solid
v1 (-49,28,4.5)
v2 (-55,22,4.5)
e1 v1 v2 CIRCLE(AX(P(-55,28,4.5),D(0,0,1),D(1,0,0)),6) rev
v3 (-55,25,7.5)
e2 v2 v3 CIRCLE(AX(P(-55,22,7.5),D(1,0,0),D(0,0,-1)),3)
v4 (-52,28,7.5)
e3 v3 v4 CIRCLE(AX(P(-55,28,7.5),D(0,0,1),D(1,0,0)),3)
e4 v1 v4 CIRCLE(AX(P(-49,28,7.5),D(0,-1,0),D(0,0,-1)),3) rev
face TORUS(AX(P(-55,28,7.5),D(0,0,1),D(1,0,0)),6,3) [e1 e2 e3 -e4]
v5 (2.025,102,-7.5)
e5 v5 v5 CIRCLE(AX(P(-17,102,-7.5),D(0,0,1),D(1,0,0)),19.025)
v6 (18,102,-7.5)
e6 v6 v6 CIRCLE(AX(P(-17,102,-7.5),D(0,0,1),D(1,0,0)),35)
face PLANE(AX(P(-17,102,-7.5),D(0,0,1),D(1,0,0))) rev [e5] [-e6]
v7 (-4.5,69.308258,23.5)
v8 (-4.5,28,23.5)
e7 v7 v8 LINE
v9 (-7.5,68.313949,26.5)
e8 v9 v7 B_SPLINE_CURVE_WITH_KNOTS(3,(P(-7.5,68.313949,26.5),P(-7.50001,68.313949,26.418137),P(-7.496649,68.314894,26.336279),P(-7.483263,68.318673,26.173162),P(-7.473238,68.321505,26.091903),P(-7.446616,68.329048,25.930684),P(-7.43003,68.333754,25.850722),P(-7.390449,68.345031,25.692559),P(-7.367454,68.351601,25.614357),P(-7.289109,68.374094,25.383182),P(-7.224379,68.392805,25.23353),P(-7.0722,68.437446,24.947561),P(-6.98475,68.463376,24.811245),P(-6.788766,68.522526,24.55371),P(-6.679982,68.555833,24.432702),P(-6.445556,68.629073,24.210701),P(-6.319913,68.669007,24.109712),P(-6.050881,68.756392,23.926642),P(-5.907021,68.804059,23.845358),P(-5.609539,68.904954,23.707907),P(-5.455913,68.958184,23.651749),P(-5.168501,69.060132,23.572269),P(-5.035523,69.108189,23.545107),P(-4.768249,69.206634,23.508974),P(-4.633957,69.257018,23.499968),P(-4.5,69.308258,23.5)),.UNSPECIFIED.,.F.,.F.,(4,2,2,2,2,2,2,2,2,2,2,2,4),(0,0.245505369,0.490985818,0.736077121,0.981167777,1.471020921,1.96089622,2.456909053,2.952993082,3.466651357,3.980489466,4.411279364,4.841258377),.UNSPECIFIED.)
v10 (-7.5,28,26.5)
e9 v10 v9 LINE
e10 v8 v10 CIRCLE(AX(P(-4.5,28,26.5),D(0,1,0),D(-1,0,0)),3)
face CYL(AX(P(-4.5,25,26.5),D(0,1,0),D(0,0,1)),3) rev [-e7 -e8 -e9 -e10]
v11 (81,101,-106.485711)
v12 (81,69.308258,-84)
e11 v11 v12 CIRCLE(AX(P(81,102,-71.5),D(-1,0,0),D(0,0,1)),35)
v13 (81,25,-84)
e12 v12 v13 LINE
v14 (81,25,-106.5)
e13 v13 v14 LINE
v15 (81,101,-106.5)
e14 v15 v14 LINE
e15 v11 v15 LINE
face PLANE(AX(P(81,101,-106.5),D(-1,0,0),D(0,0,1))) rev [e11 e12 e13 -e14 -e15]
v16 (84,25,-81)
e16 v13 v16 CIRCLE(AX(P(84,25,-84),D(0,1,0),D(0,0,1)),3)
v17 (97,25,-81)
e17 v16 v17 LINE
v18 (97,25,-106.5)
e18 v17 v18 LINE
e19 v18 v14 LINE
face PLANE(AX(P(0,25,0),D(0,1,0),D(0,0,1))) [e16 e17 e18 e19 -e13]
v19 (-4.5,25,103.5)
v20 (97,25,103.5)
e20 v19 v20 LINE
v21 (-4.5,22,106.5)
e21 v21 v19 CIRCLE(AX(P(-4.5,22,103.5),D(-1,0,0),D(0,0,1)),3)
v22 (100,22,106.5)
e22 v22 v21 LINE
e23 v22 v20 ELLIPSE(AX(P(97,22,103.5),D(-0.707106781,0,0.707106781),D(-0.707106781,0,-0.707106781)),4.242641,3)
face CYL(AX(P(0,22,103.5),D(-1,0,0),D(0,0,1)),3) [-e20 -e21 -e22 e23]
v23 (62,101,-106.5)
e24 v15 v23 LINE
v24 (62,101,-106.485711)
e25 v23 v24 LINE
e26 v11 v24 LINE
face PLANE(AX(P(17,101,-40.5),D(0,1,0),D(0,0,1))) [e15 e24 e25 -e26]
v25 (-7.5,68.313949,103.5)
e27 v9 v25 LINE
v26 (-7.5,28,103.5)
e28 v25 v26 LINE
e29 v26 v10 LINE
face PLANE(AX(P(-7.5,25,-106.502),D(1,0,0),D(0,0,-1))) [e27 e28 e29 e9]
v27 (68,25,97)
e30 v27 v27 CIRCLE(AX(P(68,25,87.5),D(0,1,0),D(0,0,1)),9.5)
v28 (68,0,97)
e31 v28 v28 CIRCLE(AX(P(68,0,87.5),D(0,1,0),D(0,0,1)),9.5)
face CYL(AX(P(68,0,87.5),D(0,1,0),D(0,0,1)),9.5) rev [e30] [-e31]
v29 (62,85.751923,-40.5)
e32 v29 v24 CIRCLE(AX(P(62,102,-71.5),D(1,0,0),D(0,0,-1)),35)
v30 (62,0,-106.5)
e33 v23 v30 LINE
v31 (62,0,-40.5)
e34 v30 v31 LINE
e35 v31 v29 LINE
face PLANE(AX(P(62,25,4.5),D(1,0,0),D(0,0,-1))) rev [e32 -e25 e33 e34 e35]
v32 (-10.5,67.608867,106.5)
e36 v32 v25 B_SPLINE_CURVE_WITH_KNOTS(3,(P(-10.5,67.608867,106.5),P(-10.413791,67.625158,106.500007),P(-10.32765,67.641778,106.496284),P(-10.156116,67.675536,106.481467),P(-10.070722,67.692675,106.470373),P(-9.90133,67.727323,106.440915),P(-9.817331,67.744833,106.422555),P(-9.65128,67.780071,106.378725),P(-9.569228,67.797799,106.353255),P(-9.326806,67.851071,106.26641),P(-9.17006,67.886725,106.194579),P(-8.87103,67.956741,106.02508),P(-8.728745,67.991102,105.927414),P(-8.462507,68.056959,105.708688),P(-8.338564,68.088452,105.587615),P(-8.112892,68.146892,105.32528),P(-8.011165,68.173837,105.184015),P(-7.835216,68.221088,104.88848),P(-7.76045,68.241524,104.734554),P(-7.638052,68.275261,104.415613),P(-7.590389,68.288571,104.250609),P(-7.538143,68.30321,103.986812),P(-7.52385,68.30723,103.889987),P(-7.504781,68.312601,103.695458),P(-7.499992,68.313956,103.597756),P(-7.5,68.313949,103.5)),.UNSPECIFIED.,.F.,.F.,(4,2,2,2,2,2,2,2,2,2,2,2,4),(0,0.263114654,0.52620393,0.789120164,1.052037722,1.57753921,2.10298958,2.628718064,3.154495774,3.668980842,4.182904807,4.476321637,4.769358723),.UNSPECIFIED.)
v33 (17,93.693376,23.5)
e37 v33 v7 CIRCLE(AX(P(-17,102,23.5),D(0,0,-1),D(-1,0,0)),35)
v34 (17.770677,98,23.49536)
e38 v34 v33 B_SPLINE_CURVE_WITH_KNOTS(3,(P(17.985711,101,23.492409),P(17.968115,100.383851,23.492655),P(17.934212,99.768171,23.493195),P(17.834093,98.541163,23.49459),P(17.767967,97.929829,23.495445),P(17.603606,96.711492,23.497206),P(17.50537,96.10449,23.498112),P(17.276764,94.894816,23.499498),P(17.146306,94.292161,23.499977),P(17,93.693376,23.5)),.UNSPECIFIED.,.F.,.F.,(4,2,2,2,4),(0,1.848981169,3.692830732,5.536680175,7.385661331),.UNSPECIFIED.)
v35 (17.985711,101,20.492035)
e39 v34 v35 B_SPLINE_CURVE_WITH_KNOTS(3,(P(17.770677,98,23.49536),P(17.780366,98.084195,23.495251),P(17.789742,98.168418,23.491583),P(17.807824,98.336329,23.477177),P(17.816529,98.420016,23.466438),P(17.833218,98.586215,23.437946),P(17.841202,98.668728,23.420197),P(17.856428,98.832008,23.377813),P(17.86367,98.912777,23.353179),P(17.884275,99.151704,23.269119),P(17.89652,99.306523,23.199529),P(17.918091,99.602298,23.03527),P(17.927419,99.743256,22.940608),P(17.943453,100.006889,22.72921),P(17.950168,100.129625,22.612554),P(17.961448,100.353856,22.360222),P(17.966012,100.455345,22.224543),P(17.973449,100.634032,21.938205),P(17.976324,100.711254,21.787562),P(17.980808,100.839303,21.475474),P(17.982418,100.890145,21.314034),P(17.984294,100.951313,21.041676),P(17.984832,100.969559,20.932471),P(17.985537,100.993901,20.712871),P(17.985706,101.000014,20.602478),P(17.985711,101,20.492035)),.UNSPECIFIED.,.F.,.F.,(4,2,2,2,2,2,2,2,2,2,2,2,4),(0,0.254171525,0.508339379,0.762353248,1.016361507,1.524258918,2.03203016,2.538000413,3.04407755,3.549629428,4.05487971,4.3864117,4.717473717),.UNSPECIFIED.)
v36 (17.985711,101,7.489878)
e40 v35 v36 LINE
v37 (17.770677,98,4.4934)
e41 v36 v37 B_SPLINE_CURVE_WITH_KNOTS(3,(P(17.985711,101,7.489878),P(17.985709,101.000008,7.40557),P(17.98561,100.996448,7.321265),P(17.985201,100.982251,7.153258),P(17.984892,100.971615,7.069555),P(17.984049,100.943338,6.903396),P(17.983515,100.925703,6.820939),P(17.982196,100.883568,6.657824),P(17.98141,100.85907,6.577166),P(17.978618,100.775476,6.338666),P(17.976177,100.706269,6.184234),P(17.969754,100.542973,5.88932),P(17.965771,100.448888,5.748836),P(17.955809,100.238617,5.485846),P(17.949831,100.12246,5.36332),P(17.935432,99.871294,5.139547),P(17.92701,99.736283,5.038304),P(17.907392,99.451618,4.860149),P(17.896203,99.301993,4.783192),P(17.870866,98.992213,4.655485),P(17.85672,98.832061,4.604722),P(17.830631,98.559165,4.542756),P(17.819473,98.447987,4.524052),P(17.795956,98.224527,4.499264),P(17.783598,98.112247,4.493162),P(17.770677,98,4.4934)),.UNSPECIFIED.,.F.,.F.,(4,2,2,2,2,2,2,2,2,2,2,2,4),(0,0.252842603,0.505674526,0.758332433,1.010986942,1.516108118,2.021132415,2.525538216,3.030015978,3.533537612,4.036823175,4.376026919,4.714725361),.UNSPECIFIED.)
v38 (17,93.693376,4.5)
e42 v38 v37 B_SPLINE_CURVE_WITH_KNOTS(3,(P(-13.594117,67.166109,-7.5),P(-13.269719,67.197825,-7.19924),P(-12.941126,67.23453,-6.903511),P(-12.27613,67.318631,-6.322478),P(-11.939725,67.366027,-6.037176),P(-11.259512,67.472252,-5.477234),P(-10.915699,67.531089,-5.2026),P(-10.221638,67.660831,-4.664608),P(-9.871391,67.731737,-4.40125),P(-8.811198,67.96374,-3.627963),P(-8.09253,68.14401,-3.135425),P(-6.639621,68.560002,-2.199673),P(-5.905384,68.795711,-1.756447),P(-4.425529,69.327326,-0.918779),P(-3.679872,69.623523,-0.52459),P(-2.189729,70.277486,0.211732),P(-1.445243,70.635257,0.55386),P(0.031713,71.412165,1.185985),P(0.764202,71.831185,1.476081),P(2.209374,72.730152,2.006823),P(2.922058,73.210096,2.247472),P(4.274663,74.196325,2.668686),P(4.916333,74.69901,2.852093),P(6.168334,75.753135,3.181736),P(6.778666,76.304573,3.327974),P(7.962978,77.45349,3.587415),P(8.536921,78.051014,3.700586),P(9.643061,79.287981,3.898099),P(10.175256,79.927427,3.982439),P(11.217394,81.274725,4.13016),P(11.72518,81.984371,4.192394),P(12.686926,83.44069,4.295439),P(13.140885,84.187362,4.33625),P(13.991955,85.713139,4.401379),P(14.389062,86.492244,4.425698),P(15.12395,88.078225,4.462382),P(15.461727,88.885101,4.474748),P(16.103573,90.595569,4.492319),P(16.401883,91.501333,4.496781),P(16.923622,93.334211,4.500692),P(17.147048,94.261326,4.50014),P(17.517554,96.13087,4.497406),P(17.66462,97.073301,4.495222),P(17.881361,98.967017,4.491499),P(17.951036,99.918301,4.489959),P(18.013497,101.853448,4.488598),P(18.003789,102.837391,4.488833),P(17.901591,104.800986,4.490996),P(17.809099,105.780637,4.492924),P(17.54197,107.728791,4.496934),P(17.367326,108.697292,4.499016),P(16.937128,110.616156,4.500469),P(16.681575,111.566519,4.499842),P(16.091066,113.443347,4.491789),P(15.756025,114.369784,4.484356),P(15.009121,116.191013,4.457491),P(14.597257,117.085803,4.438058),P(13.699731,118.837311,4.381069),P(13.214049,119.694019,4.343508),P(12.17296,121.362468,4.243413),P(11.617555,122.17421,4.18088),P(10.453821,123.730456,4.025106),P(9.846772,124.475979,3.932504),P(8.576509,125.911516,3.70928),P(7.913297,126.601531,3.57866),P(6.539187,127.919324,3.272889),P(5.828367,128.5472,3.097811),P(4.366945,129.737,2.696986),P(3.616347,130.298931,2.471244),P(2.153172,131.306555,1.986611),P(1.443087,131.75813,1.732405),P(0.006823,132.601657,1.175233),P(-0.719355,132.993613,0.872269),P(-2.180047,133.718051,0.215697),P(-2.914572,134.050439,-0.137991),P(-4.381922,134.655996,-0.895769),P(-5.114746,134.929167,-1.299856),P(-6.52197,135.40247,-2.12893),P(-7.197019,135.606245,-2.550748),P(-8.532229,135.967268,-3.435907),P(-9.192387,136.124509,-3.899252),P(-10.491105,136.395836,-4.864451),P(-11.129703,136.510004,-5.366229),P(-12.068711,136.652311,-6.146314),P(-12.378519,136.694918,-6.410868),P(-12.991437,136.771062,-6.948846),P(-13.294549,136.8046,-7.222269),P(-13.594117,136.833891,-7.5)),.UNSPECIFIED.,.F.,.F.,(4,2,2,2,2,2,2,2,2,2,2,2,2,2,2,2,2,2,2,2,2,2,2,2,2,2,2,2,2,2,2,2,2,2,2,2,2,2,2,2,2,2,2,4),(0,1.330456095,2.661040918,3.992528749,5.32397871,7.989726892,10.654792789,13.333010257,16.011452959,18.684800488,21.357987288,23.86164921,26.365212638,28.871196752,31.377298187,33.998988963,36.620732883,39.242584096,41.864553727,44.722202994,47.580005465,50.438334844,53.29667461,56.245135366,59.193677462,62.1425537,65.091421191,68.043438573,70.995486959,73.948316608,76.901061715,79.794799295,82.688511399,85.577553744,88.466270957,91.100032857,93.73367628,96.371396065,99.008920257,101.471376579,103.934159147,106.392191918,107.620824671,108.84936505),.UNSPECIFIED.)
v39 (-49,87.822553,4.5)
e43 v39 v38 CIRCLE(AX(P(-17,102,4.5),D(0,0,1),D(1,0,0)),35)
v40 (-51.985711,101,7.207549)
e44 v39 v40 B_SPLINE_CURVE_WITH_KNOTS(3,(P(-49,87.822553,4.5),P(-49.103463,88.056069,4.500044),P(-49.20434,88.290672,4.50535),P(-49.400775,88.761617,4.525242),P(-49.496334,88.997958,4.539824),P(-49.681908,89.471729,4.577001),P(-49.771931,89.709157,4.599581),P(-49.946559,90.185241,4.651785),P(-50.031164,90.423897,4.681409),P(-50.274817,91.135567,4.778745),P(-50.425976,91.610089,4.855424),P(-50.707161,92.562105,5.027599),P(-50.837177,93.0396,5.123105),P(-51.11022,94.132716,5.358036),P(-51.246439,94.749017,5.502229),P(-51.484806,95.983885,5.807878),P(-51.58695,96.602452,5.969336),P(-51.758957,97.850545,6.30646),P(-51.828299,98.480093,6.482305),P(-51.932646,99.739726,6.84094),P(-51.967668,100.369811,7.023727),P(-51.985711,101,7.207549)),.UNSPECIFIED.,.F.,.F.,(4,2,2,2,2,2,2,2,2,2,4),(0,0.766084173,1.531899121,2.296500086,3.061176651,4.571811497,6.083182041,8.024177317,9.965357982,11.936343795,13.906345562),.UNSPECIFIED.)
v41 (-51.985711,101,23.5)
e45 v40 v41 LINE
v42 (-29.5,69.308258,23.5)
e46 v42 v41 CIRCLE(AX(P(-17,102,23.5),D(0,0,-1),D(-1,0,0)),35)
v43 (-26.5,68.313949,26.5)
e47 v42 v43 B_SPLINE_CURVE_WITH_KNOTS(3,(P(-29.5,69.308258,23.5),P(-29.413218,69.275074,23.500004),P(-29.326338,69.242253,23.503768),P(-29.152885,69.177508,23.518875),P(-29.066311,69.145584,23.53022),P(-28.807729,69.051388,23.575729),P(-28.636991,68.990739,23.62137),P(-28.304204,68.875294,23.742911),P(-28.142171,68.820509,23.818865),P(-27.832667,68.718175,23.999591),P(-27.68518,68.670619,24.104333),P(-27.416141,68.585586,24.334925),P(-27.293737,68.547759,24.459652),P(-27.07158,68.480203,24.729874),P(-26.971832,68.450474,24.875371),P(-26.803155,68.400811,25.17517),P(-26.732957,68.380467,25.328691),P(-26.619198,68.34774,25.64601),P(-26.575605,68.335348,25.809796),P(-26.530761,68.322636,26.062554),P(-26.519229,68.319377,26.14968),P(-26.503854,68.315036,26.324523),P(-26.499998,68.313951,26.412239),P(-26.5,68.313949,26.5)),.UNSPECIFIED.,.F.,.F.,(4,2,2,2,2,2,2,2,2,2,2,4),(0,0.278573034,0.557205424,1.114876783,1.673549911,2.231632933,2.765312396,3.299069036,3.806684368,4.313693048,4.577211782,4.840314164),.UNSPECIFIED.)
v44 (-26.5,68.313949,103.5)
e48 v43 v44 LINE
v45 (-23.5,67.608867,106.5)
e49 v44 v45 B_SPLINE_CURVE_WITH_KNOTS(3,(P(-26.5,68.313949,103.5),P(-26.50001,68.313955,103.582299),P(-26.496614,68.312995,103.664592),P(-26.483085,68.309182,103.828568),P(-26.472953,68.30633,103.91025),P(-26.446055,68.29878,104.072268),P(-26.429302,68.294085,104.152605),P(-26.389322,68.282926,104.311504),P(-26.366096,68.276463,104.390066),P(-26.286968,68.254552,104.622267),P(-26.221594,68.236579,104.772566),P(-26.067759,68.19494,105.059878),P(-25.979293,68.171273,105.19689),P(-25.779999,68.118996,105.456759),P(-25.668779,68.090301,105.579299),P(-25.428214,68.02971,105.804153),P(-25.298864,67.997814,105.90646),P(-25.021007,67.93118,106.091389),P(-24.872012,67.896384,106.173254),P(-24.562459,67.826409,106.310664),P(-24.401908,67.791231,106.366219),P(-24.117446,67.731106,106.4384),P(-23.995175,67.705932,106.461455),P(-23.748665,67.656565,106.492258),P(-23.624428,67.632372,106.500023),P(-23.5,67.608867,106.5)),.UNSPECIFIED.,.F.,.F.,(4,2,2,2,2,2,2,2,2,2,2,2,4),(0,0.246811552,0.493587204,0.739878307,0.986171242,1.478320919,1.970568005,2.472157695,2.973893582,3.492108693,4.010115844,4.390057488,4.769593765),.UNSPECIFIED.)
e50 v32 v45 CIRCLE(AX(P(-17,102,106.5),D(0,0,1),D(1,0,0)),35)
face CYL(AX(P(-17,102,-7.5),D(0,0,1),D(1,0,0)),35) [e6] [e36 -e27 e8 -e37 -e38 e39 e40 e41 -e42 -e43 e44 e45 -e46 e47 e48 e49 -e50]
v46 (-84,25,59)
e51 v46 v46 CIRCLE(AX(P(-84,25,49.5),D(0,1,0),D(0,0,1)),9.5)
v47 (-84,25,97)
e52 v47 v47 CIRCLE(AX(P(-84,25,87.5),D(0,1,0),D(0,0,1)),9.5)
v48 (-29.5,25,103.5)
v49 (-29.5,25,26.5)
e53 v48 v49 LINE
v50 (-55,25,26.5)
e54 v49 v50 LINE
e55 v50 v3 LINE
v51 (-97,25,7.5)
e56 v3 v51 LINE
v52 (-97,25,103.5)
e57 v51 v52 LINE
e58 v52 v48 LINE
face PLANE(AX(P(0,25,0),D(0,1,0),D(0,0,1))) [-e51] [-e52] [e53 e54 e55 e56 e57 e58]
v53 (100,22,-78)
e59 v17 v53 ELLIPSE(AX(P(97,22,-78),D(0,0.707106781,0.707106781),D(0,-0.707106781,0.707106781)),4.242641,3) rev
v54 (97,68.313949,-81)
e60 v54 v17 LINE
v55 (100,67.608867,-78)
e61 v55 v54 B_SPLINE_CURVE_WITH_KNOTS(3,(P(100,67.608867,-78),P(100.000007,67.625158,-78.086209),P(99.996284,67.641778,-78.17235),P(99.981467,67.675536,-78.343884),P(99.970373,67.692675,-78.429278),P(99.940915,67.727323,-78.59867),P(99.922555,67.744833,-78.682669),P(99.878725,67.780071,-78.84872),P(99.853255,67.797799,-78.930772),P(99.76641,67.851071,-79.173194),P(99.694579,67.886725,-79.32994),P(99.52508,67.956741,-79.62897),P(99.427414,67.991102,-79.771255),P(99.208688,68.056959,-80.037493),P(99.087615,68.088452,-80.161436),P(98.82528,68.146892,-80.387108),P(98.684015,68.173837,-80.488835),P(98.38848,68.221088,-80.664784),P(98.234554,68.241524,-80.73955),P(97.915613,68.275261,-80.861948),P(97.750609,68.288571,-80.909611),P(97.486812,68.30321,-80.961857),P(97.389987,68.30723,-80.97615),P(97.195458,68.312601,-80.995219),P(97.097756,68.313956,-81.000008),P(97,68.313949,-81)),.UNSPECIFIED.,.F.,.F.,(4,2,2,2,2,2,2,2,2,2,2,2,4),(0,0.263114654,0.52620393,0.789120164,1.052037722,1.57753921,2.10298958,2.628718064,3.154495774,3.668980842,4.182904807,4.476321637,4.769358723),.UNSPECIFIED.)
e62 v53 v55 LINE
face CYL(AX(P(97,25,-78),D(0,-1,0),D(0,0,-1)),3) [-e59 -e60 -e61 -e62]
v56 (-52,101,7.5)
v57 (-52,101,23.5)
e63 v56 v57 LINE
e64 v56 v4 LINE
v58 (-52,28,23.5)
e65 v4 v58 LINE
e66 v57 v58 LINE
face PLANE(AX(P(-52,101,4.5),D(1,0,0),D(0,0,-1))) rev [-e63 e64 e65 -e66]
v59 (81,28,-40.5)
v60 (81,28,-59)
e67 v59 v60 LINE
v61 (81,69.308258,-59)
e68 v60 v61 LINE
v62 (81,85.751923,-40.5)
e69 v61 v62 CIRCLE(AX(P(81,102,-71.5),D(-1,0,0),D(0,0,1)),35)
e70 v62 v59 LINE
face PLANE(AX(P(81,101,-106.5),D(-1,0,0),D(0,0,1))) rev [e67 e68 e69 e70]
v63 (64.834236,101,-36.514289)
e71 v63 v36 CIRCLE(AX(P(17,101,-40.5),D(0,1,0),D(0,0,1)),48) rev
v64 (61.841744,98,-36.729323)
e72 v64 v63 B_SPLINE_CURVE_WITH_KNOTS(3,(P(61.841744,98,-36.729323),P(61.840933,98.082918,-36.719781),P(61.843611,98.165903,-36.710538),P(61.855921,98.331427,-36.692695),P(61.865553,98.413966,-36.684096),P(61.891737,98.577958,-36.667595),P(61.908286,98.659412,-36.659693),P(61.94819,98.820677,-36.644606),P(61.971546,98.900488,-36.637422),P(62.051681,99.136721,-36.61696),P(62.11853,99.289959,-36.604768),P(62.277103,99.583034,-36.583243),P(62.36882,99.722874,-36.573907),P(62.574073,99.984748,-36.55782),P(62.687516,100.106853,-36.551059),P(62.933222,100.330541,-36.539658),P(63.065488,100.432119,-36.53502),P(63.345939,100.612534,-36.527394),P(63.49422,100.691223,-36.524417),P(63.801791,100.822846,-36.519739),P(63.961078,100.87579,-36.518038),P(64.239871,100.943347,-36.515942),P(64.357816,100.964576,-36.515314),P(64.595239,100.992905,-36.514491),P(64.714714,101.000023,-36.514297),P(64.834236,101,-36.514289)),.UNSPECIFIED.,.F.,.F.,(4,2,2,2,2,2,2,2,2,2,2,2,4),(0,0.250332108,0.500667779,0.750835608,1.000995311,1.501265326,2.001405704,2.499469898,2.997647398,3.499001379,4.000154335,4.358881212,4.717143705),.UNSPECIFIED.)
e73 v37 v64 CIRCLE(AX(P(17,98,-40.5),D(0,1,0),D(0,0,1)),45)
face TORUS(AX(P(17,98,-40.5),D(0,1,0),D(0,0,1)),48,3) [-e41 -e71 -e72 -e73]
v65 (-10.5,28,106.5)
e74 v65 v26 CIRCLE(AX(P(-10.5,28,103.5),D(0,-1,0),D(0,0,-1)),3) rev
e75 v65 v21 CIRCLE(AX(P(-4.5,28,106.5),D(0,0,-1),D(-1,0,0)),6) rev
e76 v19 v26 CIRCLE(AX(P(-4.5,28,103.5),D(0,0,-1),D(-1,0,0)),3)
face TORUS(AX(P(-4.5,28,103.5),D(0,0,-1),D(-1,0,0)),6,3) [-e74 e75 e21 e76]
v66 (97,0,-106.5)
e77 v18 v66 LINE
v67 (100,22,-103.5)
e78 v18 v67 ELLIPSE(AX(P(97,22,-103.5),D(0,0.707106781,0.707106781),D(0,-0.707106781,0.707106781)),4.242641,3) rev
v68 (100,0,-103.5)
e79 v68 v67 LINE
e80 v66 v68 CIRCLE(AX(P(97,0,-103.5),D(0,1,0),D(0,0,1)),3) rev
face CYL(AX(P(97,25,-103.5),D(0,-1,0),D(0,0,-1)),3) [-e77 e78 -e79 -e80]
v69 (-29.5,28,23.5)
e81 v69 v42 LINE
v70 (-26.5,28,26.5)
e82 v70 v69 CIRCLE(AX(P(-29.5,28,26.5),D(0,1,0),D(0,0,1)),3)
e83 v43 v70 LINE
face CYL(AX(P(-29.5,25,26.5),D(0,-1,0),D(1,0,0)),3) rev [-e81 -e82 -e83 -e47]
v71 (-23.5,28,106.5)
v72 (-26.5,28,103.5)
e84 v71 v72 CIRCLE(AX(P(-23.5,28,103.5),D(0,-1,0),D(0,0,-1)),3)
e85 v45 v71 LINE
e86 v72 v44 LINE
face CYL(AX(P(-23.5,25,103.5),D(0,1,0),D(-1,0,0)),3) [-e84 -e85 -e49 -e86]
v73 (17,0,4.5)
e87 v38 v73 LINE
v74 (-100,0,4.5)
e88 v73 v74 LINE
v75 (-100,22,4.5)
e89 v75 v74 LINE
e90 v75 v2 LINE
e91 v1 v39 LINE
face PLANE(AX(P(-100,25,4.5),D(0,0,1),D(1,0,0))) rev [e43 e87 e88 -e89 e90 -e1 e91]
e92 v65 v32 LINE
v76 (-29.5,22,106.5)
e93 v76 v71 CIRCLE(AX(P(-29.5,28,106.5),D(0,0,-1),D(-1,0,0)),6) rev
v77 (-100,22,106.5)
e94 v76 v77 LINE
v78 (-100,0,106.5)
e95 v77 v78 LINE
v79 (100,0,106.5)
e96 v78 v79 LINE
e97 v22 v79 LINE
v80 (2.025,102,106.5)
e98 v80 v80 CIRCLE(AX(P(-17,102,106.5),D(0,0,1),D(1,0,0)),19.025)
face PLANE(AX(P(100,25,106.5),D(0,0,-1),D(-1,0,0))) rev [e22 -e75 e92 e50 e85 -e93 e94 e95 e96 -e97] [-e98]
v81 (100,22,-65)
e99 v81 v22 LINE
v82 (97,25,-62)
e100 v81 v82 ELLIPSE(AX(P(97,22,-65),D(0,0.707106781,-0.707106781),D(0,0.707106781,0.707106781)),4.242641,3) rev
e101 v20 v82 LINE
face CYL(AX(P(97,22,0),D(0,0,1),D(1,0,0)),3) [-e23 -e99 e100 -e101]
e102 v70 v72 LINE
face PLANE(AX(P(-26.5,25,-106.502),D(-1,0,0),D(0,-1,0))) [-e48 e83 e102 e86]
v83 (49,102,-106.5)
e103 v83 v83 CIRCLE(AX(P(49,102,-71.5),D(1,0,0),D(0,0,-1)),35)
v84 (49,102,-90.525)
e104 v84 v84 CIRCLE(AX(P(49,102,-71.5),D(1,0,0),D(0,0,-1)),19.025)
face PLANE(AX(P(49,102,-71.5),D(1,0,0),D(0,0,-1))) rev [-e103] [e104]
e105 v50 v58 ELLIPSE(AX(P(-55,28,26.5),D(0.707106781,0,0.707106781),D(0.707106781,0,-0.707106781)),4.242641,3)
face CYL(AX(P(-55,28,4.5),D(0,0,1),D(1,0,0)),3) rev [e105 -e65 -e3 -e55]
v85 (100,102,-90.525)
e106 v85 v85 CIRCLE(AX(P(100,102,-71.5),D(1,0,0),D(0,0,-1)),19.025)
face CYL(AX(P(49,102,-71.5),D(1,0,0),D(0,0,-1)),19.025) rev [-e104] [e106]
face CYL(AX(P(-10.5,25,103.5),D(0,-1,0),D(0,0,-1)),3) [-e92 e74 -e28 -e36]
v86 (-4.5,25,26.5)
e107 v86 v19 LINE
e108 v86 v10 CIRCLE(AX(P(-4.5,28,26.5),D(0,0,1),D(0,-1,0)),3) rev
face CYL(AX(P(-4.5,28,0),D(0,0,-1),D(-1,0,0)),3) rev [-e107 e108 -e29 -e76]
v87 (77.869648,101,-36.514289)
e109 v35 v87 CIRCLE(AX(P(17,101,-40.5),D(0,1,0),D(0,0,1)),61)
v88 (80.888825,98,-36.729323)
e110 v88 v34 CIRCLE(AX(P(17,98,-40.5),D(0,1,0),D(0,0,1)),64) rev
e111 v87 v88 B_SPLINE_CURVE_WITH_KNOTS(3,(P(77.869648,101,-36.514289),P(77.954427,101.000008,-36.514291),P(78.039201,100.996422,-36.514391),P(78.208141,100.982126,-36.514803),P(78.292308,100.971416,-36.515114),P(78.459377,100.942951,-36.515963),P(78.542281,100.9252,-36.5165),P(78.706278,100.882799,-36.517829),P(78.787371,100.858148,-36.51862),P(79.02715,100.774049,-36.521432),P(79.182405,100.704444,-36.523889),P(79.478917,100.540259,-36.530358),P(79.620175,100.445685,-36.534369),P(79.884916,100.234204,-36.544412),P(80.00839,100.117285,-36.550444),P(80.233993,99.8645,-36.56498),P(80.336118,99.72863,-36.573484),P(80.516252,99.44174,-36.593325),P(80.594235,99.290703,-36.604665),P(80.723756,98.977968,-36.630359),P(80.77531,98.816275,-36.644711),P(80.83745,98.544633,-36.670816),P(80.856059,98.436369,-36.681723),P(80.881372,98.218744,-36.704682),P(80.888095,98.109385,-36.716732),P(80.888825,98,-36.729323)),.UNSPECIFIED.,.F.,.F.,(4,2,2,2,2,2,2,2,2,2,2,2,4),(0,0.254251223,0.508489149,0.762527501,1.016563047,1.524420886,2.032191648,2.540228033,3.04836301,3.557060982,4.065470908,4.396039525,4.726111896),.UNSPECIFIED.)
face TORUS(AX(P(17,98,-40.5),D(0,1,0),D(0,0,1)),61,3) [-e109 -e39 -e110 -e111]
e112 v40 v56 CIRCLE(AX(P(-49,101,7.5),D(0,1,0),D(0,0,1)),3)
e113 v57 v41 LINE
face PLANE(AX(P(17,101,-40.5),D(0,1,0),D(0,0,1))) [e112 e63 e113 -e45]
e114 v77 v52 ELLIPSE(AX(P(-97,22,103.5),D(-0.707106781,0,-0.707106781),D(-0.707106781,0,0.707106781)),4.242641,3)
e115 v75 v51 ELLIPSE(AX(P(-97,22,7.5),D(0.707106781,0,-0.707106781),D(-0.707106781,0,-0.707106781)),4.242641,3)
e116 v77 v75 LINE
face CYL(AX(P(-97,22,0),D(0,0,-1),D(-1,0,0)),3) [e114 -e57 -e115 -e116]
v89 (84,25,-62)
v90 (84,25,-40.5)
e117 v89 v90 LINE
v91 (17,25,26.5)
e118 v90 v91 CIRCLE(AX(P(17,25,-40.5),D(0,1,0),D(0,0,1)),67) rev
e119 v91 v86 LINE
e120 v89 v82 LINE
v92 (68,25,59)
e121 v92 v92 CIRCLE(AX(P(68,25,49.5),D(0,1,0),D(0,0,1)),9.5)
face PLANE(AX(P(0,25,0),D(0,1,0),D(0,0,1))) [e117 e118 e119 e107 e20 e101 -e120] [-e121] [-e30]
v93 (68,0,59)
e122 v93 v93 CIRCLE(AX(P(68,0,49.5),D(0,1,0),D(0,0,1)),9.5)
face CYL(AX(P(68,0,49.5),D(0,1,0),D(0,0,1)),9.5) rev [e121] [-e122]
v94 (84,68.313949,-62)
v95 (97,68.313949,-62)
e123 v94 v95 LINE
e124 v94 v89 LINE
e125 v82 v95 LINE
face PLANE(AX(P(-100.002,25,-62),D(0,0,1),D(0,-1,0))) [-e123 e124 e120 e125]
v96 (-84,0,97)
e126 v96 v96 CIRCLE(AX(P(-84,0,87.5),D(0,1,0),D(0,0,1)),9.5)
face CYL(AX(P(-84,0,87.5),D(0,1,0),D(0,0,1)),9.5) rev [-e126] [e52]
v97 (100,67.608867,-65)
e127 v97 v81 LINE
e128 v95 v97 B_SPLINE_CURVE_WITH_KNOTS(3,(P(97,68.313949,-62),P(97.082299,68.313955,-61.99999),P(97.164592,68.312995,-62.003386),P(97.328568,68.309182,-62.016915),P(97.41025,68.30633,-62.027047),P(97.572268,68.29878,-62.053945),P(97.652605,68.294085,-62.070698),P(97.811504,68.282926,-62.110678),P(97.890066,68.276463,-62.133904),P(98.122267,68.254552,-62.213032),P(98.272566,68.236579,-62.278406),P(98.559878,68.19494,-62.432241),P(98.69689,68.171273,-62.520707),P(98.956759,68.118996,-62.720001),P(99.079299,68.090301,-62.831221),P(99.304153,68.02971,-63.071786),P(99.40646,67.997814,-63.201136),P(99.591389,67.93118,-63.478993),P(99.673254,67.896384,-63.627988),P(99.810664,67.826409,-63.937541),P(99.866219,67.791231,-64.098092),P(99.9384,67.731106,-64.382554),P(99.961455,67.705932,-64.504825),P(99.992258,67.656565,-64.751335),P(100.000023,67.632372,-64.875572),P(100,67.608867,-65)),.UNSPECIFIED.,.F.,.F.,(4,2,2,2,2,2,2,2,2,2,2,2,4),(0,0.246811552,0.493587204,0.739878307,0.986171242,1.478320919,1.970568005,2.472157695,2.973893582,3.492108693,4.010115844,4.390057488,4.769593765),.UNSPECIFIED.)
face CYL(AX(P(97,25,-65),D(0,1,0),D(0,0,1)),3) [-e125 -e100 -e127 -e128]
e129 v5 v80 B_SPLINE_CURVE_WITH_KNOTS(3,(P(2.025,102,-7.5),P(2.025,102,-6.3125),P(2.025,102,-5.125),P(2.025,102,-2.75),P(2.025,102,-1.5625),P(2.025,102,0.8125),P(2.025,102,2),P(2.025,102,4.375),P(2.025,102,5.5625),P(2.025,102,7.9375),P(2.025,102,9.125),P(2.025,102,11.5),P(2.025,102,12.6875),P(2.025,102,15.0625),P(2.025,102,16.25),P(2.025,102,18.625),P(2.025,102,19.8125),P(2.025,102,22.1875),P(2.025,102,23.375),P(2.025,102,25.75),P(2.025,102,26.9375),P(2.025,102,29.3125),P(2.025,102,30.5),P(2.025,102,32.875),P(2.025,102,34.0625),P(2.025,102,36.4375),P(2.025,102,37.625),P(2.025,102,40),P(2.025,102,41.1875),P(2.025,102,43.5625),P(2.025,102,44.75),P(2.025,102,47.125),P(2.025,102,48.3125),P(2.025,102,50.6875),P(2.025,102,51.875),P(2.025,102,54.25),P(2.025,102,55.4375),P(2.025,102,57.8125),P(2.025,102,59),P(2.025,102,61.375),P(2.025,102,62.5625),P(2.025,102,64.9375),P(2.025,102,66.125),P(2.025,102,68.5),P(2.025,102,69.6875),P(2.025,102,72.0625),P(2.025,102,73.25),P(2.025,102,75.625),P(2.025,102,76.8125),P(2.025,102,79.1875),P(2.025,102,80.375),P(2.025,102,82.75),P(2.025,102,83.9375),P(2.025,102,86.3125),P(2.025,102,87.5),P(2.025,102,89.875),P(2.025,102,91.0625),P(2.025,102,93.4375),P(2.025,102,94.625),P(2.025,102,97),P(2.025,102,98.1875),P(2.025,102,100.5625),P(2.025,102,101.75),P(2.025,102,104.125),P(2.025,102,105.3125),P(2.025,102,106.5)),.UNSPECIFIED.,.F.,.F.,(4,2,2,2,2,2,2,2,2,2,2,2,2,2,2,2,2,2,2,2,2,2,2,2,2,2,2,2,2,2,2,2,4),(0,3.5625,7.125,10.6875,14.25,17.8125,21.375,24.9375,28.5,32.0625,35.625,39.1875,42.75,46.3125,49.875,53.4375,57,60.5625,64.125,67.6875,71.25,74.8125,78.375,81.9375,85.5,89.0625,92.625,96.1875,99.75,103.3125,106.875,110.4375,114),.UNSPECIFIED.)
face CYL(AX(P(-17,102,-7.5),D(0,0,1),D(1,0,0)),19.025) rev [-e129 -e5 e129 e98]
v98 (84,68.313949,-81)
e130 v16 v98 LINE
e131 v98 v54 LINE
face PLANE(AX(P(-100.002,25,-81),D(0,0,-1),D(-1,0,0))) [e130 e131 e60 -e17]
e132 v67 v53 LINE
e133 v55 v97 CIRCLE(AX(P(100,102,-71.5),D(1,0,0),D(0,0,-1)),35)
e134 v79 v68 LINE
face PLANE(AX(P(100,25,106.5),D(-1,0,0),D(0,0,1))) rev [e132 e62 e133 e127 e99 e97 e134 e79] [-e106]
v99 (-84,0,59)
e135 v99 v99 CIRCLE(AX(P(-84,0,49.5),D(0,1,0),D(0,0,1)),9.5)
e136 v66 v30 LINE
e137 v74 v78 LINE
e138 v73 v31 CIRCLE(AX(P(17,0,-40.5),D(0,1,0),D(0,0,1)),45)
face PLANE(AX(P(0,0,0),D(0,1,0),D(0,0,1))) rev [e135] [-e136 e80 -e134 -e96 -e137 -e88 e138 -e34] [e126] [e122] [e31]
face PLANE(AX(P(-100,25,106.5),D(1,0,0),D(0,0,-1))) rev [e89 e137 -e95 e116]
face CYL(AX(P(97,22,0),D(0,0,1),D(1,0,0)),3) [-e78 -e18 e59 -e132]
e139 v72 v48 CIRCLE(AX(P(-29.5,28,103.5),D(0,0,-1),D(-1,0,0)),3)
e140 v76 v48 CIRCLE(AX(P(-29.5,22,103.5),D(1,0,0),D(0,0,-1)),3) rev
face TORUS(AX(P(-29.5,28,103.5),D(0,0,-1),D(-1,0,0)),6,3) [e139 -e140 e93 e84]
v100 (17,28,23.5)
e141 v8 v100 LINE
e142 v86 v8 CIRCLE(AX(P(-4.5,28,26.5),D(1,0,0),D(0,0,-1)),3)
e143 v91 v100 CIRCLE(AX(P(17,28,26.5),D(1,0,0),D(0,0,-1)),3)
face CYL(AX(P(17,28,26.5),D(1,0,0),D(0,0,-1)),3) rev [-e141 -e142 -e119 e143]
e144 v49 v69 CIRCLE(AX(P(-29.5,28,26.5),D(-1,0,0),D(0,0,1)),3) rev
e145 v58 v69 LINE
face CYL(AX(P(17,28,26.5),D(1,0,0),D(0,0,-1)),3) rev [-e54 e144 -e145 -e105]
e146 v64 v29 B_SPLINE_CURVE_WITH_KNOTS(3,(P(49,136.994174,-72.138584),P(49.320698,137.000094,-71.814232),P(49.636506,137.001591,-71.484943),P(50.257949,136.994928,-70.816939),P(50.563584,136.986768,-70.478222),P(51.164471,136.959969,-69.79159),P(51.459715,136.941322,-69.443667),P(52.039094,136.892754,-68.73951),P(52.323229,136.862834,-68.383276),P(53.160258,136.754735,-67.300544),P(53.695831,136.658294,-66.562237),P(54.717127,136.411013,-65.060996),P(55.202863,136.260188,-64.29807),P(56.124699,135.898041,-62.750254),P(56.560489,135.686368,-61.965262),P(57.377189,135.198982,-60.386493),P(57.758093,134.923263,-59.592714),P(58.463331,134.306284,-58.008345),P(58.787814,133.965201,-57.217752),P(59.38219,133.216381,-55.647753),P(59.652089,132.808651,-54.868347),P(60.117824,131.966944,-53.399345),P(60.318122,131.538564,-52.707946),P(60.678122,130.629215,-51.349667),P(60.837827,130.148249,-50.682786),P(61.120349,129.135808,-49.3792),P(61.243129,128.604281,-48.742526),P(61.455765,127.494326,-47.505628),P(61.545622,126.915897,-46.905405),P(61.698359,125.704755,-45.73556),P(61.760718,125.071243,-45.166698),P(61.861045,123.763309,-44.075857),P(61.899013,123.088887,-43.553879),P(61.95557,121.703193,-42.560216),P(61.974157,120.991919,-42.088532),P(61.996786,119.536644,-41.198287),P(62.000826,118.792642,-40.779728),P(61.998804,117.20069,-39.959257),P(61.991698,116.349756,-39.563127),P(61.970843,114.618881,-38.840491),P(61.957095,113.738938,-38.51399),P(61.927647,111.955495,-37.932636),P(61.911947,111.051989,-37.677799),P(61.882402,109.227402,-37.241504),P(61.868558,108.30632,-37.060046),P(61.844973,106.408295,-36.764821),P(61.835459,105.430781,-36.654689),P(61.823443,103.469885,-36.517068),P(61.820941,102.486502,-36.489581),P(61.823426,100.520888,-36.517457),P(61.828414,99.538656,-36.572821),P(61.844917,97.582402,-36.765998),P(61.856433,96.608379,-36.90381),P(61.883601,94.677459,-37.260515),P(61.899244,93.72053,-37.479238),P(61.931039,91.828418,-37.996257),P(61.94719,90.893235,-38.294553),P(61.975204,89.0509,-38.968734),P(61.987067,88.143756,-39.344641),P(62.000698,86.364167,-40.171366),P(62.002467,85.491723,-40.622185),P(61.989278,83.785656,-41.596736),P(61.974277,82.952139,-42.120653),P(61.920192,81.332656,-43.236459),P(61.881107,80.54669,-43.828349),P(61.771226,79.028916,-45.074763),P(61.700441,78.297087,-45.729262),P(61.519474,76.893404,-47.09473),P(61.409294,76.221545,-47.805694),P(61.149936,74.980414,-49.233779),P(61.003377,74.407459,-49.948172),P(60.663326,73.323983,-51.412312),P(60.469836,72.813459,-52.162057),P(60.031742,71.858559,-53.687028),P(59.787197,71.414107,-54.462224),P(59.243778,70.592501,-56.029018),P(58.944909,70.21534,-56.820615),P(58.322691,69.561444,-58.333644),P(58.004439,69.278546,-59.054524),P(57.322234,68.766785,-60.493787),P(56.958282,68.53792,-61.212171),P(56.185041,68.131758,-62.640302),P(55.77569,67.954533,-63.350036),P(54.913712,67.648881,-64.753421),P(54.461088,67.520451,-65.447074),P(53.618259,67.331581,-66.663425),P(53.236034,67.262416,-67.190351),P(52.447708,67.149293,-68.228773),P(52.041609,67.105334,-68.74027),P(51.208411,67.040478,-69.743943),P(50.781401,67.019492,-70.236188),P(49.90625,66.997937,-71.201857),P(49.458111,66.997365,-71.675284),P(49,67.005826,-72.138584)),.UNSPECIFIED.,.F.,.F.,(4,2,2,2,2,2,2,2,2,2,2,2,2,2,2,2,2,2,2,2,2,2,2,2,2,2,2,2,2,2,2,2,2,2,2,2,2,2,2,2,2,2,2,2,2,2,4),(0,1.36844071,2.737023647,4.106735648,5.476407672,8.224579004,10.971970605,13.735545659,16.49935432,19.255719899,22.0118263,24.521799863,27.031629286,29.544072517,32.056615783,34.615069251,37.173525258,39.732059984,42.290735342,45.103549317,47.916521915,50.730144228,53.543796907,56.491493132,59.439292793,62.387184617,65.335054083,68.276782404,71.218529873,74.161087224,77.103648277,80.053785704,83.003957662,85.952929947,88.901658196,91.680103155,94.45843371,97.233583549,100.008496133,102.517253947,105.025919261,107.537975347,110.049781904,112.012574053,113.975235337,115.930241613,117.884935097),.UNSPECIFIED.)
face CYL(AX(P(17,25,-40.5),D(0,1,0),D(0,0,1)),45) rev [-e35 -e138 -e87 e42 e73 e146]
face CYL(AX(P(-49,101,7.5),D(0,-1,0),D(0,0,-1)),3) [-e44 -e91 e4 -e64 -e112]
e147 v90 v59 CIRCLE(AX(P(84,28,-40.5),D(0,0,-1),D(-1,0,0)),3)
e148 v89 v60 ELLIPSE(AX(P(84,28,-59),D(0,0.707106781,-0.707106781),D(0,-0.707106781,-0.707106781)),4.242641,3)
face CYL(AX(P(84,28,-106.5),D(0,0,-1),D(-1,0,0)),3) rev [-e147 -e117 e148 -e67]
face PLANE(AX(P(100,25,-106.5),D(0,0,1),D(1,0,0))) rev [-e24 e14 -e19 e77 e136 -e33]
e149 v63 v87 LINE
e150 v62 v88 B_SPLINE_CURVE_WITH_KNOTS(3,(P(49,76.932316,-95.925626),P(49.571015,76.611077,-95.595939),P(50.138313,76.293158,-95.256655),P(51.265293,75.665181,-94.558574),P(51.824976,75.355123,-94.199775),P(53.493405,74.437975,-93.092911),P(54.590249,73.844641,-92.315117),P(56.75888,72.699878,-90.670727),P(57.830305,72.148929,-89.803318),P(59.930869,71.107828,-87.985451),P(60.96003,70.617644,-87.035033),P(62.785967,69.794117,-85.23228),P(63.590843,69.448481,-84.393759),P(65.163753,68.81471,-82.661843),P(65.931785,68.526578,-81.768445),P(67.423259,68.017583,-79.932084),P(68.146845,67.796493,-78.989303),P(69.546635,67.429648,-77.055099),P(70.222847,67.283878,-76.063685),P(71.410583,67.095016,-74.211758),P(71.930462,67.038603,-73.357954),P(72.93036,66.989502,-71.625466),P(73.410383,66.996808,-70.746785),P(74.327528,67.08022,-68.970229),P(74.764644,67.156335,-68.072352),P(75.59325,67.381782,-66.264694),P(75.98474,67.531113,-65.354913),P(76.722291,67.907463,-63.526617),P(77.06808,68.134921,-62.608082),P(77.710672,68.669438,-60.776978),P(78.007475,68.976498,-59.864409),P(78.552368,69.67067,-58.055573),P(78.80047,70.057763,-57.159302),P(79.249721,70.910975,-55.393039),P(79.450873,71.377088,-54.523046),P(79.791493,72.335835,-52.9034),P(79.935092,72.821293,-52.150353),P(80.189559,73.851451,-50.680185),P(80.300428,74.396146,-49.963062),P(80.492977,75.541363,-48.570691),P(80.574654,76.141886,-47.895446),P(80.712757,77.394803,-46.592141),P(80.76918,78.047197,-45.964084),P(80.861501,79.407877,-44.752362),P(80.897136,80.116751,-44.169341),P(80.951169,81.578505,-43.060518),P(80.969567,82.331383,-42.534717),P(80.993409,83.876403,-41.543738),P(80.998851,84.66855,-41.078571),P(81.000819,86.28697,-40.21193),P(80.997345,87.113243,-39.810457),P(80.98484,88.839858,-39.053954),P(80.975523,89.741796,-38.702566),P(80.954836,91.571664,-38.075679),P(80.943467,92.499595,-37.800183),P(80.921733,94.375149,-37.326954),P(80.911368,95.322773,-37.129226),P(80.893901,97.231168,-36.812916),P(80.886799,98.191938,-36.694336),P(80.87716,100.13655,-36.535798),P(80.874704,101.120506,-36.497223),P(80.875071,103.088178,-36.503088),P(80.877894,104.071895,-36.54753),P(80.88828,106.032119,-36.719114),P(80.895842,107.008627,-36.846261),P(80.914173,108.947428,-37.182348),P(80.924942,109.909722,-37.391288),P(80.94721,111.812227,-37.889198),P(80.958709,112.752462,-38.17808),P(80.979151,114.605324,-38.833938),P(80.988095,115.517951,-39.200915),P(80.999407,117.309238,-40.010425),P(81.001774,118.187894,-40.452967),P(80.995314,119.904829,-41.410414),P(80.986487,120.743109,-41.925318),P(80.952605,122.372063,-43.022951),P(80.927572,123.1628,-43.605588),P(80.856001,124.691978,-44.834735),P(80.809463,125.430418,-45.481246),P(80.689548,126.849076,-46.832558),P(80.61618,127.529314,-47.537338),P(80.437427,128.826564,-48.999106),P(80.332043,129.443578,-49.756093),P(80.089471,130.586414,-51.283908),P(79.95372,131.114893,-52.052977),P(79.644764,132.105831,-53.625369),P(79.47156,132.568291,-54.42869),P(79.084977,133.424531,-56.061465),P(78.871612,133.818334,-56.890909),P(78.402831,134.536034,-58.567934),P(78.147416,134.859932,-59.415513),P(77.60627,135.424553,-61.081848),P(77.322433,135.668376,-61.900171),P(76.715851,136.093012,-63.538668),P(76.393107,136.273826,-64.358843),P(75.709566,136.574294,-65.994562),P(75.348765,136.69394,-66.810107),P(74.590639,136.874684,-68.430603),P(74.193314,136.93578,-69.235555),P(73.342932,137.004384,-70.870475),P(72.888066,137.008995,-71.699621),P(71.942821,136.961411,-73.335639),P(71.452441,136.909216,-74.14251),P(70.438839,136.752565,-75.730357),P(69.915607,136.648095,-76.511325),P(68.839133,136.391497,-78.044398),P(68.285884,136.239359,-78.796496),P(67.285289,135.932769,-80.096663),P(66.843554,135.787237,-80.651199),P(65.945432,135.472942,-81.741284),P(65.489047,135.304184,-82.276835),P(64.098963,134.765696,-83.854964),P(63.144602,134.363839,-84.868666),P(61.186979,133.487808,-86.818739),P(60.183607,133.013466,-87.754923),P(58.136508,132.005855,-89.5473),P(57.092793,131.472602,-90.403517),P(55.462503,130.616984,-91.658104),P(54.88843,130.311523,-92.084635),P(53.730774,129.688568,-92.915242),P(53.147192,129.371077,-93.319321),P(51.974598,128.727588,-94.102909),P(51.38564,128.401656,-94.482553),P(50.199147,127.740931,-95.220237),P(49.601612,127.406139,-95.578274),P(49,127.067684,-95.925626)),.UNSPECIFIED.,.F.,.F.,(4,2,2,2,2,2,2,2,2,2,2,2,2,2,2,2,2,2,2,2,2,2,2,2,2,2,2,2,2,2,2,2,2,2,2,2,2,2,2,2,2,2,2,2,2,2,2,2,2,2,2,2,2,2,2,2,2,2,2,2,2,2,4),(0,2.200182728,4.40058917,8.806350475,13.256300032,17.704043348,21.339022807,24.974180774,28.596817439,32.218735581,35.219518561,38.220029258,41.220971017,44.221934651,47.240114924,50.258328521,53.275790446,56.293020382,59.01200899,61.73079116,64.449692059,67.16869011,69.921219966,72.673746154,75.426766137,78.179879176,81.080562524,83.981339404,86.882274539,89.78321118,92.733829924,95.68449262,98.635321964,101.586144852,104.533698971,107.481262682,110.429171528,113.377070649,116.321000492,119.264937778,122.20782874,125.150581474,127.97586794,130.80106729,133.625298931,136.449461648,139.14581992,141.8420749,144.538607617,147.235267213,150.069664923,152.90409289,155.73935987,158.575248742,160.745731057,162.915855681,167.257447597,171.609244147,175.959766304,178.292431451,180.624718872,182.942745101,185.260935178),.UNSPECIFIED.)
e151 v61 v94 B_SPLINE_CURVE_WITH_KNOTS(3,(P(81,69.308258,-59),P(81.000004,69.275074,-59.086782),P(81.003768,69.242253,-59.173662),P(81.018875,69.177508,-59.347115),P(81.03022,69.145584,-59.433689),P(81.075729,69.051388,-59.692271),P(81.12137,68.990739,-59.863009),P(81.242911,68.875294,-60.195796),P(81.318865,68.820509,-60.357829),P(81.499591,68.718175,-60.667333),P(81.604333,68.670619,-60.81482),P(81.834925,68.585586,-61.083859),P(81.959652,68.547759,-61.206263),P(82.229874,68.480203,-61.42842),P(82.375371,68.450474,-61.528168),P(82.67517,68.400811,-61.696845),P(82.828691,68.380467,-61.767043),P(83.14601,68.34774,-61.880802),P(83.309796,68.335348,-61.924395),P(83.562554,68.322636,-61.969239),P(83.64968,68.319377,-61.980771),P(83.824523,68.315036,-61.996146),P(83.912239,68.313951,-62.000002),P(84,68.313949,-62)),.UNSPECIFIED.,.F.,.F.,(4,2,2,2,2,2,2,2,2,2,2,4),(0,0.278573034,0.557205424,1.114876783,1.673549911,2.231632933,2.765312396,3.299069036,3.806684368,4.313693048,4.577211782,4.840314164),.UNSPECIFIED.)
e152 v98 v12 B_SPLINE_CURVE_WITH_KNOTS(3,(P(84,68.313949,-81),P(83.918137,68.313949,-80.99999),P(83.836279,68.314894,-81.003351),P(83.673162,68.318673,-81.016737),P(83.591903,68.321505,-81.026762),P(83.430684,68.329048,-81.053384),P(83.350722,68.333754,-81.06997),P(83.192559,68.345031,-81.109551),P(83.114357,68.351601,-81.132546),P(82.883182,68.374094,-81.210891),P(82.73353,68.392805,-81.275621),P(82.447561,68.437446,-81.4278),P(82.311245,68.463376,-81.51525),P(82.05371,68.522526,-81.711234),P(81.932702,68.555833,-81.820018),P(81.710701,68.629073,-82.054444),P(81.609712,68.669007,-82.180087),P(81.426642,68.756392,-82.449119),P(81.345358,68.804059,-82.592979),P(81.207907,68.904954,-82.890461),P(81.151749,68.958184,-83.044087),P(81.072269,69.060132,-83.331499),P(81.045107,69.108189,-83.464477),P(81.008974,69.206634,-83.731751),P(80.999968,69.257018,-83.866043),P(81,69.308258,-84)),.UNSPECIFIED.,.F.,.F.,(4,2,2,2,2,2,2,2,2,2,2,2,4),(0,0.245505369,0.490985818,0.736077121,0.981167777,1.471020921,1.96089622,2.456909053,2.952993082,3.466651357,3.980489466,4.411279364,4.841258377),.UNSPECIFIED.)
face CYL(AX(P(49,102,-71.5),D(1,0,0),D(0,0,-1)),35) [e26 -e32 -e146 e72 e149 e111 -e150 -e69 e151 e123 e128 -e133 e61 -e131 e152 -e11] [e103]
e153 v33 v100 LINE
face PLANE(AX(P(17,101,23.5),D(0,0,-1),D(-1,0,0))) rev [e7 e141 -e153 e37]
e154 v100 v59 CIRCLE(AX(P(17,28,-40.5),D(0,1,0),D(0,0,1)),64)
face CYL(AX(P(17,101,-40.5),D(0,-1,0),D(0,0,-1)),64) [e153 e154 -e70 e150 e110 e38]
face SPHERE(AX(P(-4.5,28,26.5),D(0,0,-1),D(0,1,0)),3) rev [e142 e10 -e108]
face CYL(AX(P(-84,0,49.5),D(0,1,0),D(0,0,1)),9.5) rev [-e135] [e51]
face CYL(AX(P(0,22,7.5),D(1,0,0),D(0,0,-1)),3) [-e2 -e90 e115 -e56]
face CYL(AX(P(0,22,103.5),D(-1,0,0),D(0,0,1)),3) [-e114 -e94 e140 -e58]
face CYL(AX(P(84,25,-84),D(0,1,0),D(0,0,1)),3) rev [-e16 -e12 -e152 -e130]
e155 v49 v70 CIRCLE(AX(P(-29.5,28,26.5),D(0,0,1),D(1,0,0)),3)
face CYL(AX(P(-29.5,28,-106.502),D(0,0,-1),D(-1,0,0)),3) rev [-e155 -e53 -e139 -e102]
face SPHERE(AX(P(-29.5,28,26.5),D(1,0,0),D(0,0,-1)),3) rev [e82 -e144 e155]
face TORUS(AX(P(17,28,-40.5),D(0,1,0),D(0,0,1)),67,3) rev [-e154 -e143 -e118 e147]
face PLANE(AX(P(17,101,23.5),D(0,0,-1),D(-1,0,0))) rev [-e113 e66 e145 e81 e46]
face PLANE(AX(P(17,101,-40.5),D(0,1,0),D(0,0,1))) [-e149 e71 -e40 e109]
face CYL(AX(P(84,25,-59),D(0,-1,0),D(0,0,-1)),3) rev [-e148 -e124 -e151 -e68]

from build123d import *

# Parameters (mm, degrees)
BOSS_EXTRUDE2_DEPTH = 25
FILLET1_R           = 45
SKETCH7_R           = 35
SKETCH7_R_2         = 19.025
BOSS_EXTRUDE3_DEPTH = 114
SKETCH8_R           = 35
SKETCH8_R_2         = 19.025
BOSS_EXTRUDE4_DEPTH = 51
BOSS_EXTRUDE5_START = 76
BOSS_EXTRUDE5_DEPTH = 76
SKETCH8_2_R         = 19.025
CUT_EXTRUDE1_DEPTH  = 265.785290469
SKETCH7_2_R         = 19.025
CUT_EXTRUDE2_DEPTH  = 273.282941239
BOSS_EXTRUDE6_REACH = 274.283
BOSS_EXTRUDE7_REACH = 266.785
SKETCH12_R          = 9.5
CUT_EXTRUDE3_DEPTH  = 185.082182907
FILLET2_R           = 3


with BuildPart() as part:
    # Sketch2 → Boss-Extrude2 (new body)
    with BuildSketch(Plane(origin=(0, 0, 0), x_dir=(1, 0, 0), z_dir=(0, 1, 0))):
        Polygon((-100, -106.5), (-100, -4.5), (62, -4.5), (62, 106.5), (100, 106.5), (100, -106.5), align=None)
    extrude(amount=BOSS_EXTRUDE2_DEPTH)

    # Fillet1
    fillet1_edges = [part.edges().sort_by_distance(p)[0] for p in [
        (62, 12.5, 4.5),
    ]]
    fillet(fillet1_edges, radius=FILLET1_R)



with BuildPart() as body_2:
    # Sketch7 → Boss-Extrude3 (new body)
    with BuildSketch(Plane.XY.offset(106.5)):
        with Locations((-17, 102)):
            Circle(SKETCH7_R)
        with Locations((-17, 102)):
            Circle(SKETCH7_R_2, mode=Mode.SUBTRACT)
    extrude(amount=-BOSS_EXTRUDE3_DEPTH)


with BuildPart() as body_3:
    # Sketch8 → Boss-Extrude4 (new body)
    with BuildSketch(Plane(origin=(100, 0, 0), x_dir=(0, 0, -1), z_dir=(1, 0, 0))):
        with Locations((71.5, 102)):
            Circle(SKETCH8_R)
        with Locations((71.5, 102)):
            Circle(SKETCH8_R_2, mode=Mode.SUBTRACT)
    extrude(amount=-BOSS_EXTRUDE4_DEPTH)


with BuildPart() as part_1:
    add(part.part)

    add(body_2.part)  # Boss-Extrude5 merges body 2

    add(body_3.part)  # Boss-Extrude5 merges body 3
    # Sketch9 → Boss-Extrude5 (add)
    with BuildSketch(Plane(origin=(0, 25, 0), x_dir=(1, 0, 0), z_dir=(0, 1, 0)).offset(BOSS_EXTRUDE5_START)):
        with BuildLine():
            Line((17, -4.5), (-52, -4.5))
            Line((-52, -4.5), (-52, -23.5))
            Line((-52, -23.5), (17, -23.5))
            ThreePointArc((17, -23.5), (62.254833996, -4.754833996), (81, 40.5))
            Line((81, 40.5), (81, 106.5))
            Line((81, 106.5), (62, 106.5))
            Line((62, 106.5), (62, 40.5))
            ThreePointArc((62, 40.5), (48.819805153, 8.680194847), (17, -4.5))
        make_face()
    extrude(amount=-BOSS_EXTRUDE5_DEPTH)

    # Sketch8<2> → Cut-Extrude1 (cut, through all)
    with BuildSketch(Plane(origin=(100, 0, 0), x_dir=(0, 0, -1), z_dir=(1, 0, 0))):
        with Locations((71.5, 102)):
            Circle(SKETCH8_2_R)
    extrude(amount=-CUT_EXTRUDE1_DEPTH, mode=Mode.SUBTRACT)

    # Sketch7<2> → Cut-Extrude2 (cut, through all)
    with BuildSketch(Plane.XY.offset(106.5)):
        with Locations((-17, 102)):
            Circle(SKETCH7_2_R)
    extrude(amount=-CUT_EXTRUDE2_DEPTH, mode=Mode.SUBTRACT)

    # Sketch10 → Boss-Extrude6 (add, up to next)
    with BuildSketch(Plane.XY.offset(106.5), mode=Mode.PRIVATE) as boss_extrude6_sk1:
        with BuildLine():
            Line((-26.5, 25), (-7.5, 25))
            Line((-7.5, 25), (-7.5, 68.313949475))
            ThreePointArc((-7.5, 68.313949475), (-17, 67), (-26.5, 68.313949475))
            Line((-26.5, 68.313949475), (-26.5, 25))
        make_face()
    boss_extrude6_tool1 = extrude(boss_extrude6_sk1.sketch, amount=-BOSS_EXTRUDE6_REACH, mode=Mode.PRIVATE) - part_1.part
    add(boss_extrude6_tool1.solids().sort_by_distance((-17, 46.219119, 106.5))[0])

    # Sketch11 → Boss-Extrude7 (add, up to next)
    with BuildSketch(Plane(origin=(100, 0, 0), x_dir=(0, 0, -1), z_dir=(1, 0, 0)), mode=Mode.PRIVATE) as boss_extrude7_sk1:
        with BuildLine():
            Line((62, 25), (81, 25))
            Line((81, 25), (81, 68.313949475))
            ThreePointArc((81, 68.313949475), (71.5, 67), (62, 68.313949475))
            Line((62, 68.313949475), (62, 25))
        make_face()
    boss_extrude7_tool1 = extrude(boss_extrude7_sk1.sketch, amount=-BOSS_EXTRUDE7_REACH, mode=Mode.PRIVATE) - part_1.part
    add(boss_extrude7_tool1.solids().sort_by_distance((100, 46.219119, -71.5))[0])

    # Sketch12 → Cut-Extrude3 (cut, through all)
    with BuildSketch(Plane(origin=(0, 25, 0), x_dir=(1, 0, 0), z_dir=(0, 1, 0))):
        with Locations((68, -49.5)):
            Circle(SKETCH12_R)
        with Locations((68, -87.5)):
            Circle(SKETCH12_R)
        with Locations((-84, -49.5)):
            Circle(SKETCH12_R)
        with Locations((-84, -87.5)):
            Circle(SKETCH12_R)
    extrude(amount=-CUT_EXTRUDE3_DEPTH, mode=Mode.SUBTRACT)

    # Fillet2
    fillet2_edges = [part_1.edges().sort_by_distance(p)[0] for p in [
        (-52, 63, 4.5),
        (-7.5, 46.656974737, 106.5),
        (4.75, 25, 23.5),
        (81, 25, -51.25),
        (47.739784514, 101, -7.635647762),
        (-26.5, 25, 65),
        (-52, 25, 14),
        (-39.25, 25, 23.5),
        (-26.5, 46.656974737, 23.5),
        (-76, 25, 4.5),
        (-100, 25, 55.5),
        (-63.25, 25, 106.5),
        (-7.5, 46.656974737, 23.5),
        (81, 46.656974737, -81),
        (81, 46.656974737, -62),
        (100, 12.5, -106.5),
        (100, 25, -93.75),
        (100, 46.656974737, -81),
        (100, 46.656974737, -62),
        (61.180922368, 101, 5.803845399),
        (-26.5, 46.656974737, 106.5),
        (100, 25, 22.25),
        (46.25, 25, 106.5),
        (-7.5, 25, 65),
        (62.254833996, 25, 4.754833996),
    ]]
    fillet(fillet2_edges, radius=FILLET2_R)


solid = part_1.part
